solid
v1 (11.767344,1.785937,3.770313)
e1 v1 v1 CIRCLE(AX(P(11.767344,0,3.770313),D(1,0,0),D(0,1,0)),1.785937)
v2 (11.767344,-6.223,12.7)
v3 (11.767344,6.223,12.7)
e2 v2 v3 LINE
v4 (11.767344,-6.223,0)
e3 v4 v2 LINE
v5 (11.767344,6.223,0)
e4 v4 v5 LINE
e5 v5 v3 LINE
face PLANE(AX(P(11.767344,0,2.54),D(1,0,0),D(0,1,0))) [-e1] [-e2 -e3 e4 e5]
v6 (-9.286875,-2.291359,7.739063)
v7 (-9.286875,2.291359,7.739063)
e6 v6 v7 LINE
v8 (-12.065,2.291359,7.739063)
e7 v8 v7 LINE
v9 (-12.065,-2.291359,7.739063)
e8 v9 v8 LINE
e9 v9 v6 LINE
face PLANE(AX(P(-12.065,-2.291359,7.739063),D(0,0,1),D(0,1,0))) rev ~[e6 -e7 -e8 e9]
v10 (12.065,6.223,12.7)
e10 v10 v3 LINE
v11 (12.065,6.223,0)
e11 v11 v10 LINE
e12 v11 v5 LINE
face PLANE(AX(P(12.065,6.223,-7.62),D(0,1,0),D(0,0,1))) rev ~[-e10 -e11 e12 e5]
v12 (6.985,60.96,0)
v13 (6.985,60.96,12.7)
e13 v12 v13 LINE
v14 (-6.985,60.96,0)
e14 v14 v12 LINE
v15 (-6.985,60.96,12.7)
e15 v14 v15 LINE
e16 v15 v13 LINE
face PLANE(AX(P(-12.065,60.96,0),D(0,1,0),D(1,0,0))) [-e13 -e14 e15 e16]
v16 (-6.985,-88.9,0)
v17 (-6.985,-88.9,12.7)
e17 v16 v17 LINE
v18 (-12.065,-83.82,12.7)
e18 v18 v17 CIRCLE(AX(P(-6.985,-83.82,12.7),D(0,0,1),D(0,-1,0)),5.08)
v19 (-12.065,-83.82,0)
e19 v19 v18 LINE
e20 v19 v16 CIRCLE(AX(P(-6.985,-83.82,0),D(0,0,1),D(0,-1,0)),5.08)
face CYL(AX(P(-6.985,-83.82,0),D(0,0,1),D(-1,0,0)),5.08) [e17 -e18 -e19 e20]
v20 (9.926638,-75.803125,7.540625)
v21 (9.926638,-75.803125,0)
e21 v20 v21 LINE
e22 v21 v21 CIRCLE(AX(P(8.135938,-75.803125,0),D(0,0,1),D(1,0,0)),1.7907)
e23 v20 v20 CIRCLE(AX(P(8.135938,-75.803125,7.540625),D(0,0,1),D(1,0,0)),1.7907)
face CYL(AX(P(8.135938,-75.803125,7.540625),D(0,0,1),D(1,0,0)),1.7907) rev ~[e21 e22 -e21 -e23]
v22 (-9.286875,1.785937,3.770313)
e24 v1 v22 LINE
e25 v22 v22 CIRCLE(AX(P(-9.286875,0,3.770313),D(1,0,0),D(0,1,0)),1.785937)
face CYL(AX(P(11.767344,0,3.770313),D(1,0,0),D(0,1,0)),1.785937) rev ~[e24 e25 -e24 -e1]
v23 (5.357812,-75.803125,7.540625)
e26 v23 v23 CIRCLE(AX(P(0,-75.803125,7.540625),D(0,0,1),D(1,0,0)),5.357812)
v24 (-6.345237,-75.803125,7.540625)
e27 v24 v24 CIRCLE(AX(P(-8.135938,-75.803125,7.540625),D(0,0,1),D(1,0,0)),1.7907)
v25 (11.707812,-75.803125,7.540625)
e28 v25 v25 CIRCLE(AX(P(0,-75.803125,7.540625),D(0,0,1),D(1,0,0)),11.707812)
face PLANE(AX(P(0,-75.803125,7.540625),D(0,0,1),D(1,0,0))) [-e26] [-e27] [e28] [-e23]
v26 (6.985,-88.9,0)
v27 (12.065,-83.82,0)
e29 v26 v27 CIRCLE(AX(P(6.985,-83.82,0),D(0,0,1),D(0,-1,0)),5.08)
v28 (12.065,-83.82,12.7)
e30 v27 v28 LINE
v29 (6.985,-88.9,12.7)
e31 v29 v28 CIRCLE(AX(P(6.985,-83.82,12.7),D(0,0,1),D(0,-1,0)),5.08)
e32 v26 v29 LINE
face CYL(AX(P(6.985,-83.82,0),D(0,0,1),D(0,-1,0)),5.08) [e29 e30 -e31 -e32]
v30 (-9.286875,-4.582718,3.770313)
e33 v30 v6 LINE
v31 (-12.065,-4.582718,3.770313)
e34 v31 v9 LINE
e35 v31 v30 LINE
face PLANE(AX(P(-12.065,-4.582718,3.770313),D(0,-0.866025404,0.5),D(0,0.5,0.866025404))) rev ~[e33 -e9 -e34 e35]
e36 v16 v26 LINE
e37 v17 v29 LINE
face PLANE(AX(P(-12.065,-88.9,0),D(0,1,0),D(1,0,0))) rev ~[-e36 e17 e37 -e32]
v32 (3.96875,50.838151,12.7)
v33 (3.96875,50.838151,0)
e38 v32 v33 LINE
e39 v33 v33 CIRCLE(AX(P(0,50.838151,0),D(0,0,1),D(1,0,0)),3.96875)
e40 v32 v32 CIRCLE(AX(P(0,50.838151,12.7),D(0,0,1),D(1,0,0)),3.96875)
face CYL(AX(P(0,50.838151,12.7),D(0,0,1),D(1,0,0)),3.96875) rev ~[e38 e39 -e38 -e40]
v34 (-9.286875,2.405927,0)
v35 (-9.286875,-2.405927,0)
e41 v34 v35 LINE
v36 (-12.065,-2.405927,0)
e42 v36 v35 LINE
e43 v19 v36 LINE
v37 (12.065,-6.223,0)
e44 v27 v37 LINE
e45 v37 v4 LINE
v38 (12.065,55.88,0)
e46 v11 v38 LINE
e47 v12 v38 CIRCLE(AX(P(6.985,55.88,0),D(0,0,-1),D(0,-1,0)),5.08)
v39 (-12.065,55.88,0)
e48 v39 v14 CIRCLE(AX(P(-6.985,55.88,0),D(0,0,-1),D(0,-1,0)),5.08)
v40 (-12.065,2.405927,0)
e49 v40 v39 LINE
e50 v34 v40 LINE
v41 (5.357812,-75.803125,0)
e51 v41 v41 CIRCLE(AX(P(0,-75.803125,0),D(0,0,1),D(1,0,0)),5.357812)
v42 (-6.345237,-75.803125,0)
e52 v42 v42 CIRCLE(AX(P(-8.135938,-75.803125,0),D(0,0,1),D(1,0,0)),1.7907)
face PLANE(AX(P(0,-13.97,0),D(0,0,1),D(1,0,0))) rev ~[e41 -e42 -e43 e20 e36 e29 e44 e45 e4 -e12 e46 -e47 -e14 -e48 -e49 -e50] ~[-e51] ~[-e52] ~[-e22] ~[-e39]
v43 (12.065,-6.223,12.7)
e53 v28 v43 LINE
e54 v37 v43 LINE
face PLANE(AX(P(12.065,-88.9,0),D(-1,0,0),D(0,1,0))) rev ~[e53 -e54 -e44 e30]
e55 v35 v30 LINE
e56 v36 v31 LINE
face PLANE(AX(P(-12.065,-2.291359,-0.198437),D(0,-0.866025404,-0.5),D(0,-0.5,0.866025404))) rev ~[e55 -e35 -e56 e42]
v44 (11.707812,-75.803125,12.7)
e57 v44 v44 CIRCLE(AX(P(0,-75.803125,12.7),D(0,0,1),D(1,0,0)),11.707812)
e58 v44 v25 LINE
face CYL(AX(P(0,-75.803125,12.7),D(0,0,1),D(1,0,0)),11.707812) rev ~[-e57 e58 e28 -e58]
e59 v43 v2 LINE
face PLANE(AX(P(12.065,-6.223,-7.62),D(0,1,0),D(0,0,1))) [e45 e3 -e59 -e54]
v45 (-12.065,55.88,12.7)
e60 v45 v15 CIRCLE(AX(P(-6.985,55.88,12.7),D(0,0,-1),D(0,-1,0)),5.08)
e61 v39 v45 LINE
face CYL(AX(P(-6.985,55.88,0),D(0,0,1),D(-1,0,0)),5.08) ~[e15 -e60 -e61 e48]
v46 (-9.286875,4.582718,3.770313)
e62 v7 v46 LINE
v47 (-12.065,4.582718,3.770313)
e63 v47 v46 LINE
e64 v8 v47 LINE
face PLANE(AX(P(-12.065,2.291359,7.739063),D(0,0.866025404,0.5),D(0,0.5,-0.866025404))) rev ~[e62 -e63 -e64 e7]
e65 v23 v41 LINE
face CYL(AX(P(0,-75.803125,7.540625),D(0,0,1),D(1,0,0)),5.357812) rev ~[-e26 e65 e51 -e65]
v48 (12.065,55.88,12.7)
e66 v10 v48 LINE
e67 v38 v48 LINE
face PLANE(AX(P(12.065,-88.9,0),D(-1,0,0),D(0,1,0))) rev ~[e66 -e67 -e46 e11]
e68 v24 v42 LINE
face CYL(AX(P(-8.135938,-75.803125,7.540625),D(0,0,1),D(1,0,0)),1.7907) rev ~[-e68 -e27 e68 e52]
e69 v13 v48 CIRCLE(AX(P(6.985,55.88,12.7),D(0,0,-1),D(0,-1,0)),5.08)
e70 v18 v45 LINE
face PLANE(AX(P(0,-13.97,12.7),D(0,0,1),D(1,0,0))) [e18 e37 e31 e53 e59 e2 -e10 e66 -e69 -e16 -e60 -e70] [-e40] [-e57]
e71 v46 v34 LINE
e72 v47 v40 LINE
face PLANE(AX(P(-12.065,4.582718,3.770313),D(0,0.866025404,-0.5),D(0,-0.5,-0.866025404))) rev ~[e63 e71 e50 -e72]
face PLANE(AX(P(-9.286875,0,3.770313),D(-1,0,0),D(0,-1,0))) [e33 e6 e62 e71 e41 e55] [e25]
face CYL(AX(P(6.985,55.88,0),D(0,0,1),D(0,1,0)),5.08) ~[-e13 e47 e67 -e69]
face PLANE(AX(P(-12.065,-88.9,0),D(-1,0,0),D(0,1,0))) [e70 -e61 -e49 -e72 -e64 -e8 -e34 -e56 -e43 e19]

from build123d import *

# Parameters (mm, degrees)
F0_W      = 24.13
F0_H      = 149.86
F1_DEPTH  = 12.7
F2_W      = 12.446
F2_H      = 20.32
F3_DEPTH  = 0.29765625
F4_R      = 3.96875
F5_DEPTH  = 25.4
F7_R      = 1.7859375
F8_DEPTH  = 25.4
F6_R      = 11.7078125
F9_DEPTH  = 5.159375
F10_R     = 5.3578125
F11_DEPTH = 25.4
F12_R     = 1.7907
F13_DEPTH = 25.4
F14_R     = 5.08
F16_DEPTH = 2.778125


# Not quite as in the source:
# - a length typed as a fraction of an inch, garbled in the dataset ("3 / 203.2 mm" for 3/8 in), is restored


with BuildPart() as f1:
    # F0 (on Top) → F1 (new body)
    with BuildSketch(Plane.XY):
        with Locations((0, -13.97)):
            Rectangle(F0_W, F0_H)
    extrude(amount=F1_DEPTH)

    # F2 (on face) → F3 (cut)
    with BuildSketch(Plane.YZ.offset(12.065)):
        with Locations((0, 2.54)):
            Rectangle(F2_W, F2_H)
    extrude(amount=-F3_DEPTH, mode=Mode.SUBTRACT)

    # F4 (on face) → F5 (cut)
    with BuildSketch(Plane.XY.offset(12.7)):
        with Locations((0, 50.8381508)):
            Circle(F4_R)
    extrude(amount=-F5_DEPTH, mode=Mode.SUBTRACT)

    # F7 (on face) → F8 (cut)
    with BuildSketch(Plane.YZ.offset(11.76734375)):
        with Locations((0, 3.7703125)):
            Circle(F7_R)
    extrude(amount=-F8_DEPTH, mode=Mode.SUBTRACT)

    # F6 (on face) → F9 (cut)
    with BuildSketch(Plane.XY.offset(12.7)):
        with Locations((0, -75.803125)):
            Circle(F6_R)
    extrude(amount=-F9_DEPTH, mode=Mode.SUBTRACT)

    # F10 (on face) → F11 (cut)
    with BuildSketch(Plane.XY.offset(7.540625)):
        with Locations((0, -75.803125)):
            Circle(F10_R)
    extrude(amount=-F11_DEPTH, mode=Mode.SUBTRACT)

    # F12 (on face) → F13 (cut)
    with BuildSketch(Plane.XY.offset(7.540625)):
        with Locations((-8.1359375, -75.803125)):
            Circle(F12_R)
        with Locations((8.1359375, -75.803125)):
            Circle(F12_R)
    extrude(amount=-F13_DEPTH, mode=Mode.SUBTRACT)

    # F14
    f14_edges = [f1.edges().sort_by_distance(p)[0] for p in [
        (-12.065, -88.9, 6.35),
        (12.065, -88.9, 6.35),
        (-12.065, 60.96, 6.35),
        (12.065, 60.96, 6.35),
    ]]
    fillet(f14_edges, radius=F14_R)

    # F15 (on face) → F16 (cut)
    with BuildSketch(Plane(origin=(-12.065, 0, 0), x_dir=(0, -1, 0), z_dir=(-1, 0, 0))):
        Polygon((2.2913588808, 7.7390625), (-2.2913588808, 7.7390625), (-4.5827177617, 3.7703125), (-2.2913588808, -0.1984375), (2.2913588808, -0.1984375), (4.5827177617, 3.7703125), align=None)
    extrude(amount=-F16_DEPTH, mode=Mode.SUBTRACT)


solid = f1.part
